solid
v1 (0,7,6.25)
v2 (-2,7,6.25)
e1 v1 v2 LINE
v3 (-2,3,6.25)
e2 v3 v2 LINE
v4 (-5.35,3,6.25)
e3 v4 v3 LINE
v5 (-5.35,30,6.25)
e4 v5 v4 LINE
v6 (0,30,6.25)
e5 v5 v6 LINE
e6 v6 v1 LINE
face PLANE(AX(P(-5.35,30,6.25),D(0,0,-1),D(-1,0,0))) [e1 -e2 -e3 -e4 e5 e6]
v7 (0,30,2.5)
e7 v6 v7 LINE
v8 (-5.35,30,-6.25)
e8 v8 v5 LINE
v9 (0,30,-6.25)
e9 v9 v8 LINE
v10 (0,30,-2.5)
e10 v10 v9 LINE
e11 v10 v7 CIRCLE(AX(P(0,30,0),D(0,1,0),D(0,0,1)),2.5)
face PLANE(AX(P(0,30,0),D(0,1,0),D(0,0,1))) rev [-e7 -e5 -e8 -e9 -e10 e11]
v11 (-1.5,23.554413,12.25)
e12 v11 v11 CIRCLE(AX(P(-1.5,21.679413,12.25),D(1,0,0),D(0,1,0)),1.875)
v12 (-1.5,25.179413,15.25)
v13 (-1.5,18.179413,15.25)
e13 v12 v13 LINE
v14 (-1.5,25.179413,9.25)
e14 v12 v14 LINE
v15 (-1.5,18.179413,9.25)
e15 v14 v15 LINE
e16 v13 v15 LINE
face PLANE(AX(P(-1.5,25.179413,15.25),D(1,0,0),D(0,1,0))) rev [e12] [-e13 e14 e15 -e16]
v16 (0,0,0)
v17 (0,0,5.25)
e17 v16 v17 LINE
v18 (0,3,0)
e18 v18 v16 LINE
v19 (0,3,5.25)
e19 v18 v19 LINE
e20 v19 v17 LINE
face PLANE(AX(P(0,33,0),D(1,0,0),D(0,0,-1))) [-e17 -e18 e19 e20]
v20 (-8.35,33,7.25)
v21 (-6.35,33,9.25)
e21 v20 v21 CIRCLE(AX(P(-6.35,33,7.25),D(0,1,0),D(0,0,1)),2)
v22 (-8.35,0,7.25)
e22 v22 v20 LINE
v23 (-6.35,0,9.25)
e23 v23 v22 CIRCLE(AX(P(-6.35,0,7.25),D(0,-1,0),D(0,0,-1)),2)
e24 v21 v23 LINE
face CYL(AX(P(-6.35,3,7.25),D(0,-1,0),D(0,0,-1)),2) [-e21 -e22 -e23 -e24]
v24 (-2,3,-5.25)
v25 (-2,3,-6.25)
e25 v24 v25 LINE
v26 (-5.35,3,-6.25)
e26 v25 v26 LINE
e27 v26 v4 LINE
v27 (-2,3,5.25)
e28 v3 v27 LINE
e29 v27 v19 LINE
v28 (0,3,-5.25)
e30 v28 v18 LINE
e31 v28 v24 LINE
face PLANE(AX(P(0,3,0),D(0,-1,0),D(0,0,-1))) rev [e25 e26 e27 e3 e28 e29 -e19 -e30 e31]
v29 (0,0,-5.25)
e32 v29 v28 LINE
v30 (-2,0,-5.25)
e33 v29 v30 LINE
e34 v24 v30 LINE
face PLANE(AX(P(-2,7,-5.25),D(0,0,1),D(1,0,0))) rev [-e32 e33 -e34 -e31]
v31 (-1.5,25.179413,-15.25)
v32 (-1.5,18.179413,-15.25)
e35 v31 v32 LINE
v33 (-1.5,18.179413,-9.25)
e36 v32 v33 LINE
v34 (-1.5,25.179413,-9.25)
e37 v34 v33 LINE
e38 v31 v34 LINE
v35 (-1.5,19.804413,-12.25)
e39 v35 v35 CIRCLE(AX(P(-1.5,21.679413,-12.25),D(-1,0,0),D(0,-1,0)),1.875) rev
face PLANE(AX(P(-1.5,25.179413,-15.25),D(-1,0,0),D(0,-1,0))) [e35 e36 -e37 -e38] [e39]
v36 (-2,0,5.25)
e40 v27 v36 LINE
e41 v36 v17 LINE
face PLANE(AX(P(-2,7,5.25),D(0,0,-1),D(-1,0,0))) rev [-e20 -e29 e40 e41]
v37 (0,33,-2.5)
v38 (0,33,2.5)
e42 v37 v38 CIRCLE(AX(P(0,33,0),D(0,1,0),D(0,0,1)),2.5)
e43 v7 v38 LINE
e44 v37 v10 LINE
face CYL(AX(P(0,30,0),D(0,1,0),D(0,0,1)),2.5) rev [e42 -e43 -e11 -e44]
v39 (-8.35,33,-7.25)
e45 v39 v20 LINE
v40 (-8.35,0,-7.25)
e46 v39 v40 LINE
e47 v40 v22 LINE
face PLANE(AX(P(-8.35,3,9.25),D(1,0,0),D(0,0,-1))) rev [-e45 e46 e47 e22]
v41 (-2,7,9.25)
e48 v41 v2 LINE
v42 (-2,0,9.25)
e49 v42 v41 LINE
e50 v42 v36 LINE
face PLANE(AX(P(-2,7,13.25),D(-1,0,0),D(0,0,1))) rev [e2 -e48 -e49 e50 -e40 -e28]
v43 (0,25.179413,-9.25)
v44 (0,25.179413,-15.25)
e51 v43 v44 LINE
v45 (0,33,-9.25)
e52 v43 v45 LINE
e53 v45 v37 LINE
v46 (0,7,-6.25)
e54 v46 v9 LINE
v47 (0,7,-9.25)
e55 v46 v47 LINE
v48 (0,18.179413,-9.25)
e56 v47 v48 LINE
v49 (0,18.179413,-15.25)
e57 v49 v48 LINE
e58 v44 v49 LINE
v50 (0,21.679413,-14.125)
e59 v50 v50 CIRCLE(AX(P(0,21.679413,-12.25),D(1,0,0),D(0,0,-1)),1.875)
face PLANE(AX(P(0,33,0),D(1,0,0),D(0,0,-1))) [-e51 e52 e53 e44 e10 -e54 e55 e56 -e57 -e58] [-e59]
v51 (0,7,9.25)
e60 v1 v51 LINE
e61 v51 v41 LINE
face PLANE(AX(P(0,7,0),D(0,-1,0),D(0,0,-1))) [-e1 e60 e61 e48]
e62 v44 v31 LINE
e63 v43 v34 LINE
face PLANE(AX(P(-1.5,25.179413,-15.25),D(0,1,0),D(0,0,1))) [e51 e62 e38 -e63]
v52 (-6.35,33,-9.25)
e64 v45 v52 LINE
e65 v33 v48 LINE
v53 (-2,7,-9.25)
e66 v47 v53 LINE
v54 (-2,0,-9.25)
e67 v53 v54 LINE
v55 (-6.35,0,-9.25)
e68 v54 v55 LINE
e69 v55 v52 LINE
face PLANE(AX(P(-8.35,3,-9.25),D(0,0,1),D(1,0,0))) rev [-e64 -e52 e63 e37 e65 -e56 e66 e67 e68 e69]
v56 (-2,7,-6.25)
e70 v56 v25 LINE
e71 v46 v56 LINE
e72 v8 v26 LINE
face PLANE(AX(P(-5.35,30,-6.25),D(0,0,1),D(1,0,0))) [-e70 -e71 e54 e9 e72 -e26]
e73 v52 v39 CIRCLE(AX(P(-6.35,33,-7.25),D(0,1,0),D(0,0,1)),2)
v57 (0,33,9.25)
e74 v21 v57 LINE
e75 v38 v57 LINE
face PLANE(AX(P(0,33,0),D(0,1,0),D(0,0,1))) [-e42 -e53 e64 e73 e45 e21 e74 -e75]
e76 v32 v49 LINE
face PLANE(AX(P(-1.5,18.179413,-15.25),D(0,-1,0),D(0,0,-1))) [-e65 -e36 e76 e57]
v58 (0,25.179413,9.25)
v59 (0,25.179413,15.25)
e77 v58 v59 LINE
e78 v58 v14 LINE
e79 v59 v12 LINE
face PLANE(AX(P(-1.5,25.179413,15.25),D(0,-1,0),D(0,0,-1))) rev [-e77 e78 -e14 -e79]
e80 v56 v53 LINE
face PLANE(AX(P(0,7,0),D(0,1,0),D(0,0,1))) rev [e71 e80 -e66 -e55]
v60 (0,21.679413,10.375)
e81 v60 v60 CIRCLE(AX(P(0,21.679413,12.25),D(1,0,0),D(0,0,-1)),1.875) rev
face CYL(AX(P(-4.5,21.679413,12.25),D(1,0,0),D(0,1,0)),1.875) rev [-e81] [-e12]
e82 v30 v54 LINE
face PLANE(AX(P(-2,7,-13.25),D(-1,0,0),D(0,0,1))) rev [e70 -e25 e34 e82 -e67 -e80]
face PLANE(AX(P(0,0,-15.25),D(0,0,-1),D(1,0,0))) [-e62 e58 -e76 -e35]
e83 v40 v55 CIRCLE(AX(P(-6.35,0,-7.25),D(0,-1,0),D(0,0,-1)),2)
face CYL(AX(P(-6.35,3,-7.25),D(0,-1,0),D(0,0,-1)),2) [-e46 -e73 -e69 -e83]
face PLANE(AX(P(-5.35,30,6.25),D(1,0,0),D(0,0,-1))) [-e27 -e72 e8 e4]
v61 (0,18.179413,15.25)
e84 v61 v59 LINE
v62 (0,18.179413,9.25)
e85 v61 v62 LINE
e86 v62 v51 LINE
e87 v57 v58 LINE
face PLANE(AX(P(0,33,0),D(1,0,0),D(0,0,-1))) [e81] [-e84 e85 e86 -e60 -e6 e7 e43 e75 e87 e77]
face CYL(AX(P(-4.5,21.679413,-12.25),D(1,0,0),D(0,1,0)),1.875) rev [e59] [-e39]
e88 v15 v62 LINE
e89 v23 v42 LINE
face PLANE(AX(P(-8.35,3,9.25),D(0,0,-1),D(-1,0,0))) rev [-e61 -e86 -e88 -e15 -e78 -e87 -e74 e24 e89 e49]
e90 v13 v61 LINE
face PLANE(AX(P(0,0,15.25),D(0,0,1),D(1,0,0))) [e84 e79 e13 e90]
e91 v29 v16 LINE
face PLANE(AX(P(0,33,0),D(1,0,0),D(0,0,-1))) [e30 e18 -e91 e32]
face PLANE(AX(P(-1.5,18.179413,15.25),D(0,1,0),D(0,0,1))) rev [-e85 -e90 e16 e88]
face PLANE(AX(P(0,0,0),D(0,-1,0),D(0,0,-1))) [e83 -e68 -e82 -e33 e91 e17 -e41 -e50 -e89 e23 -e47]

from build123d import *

# Parameters (mm, degrees)
SKETCH1_W           = 16.7
SKETCH1_H           = 18.5
BOSS_EXTRUDE1_DEPTH = 3
SKETCH2_W           = 16.7
SKETCH2_H           = 18.5
SKETCH2_W_2         = 10.7
SKETCH2_H_2         = 12.5
BOSS_EXTRUDE2_DEPTH = 27
SKETCH7_W           = 4
SKETCH7_H           = 8
CUT_EXTRUDE1_DEPTH  = 7
SKETCH9_W           = 16.7
SKETCH9_H           = 18.5
BOSS_EXTRUDE3_DEPTH = 3
SKETCH10_R          = 2.5
CUT_EXTRUDE2_DEPTH  = 3
FILLET1_R           = 2
SKETCH11_W          = 3
SKETCH11_H          = 7
BOSS_EXTRUDE4_DEPTH = 6
SKETCH12_R          = 1.875
CUT_EXTRUDE3_DEPTH  = 6
CUT_EXTRUDE4_START  = -33
CUT_EXTRUDE4_DEPTH  = 33


# Read off the part's stored shape, not the designer's step: Cut-Extrude4
with BuildPart() as part:
    # Sketch1 → Boss-Extrude1 (new body)
    with BuildSketch(Plane(origin=(0, 0, 0), x_dir=(1, 0, 0), z_dir=(0, 1, 0))):
        Rectangle(SKETCH1_W, SKETCH1_H)
    extrude(amount=BOSS_EXTRUDE1_DEPTH)

    # Sketch2 → Boss-Extrude2 (add)
    with BuildSketch(Plane(origin=(0, 3, 0), x_dir=(1, 0, 0), z_dir=(0, 1, 0))):
        Rectangle(SKETCH2_W, SKETCH2_H)
        Rectangle(SKETCH2_W_2, SKETCH2_H_2, mode=Mode.SUBTRACT)
    extrude(amount=BOSS_EXTRUDE2_DEPTH)

    # Sketch7 → Cut-Extrude1 (cut)
    with BuildSketch(Plane.XZ):
        with Locations((0, 9.25)):
            Rectangle(SKETCH7_W, SKETCH7_H)
        with Locations((0, -9.25)):
            Rectangle(SKETCH7_W, SKETCH7_H)
    extrude(amount=-CUT_EXTRUDE1_DEPTH, mode=Mode.SUBTRACT)

    # Sketch9 → Boss-Extrude3 (add)
    with BuildSketch(Plane(origin=(0, 30, 0), x_dir=(1, 0, 0), z_dir=(0, 1, 0))):
        Rectangle(SKETCH9_W, SKETCH9_H)
    extrude(amount=BOSS_EXTRUDE3_DEPTH)

    # Sketch10 → Cut-Extrude2 (cut)
    with BuildSketch(Plane(origin=(0, 33, 0), x_dir=(1, 0, 0), z_dir=(0, 1, 0))):
        with Locations(Location((0, 0, 0), (0, 0, 270))):
            Circle(SKETCH10_R)
    extrude(amount=-CUT_EXTRUDE2_DEPTH, mode=Mode.SUBTRACT)

    # Fillet1
    fillet1_edges = [part.edges().sort_by_distance(p)[0] for p in [
        (8.35, 16.5, 9.25),
        (-8.35, 16.5, 9.25),
        (-8.35, 16.5, -9.25),
        (8.35, 16.5, -9.25),
    ]]
    fillet(fillet1_edges, radius=FILLET1_R)

    # Sketch11 → Boss-Extrude4 (add)
    with BuildSketch(Plane.XY.offset(9.25)):
        with Locations((0, 21.679413475)):
            Rectangle(SKETCH11_W, SKETCH11_H)
    boss_extrude4 = extrude(amount=BOSS_EXTRUDE4_DEPTH)

    # Sketch12 → Cut-Extrude3 (cut)
    with BuildSketch(Plane(origin=(1.5, 0, 0), x_dir=(0, 0, -1), z_dir=(1, 0, 0))):
        with Locations(Location((-12.25, 21.679413475, 0), (0, 0, 90))):
            Circle(SKETCH12_R)
    cut_extrude3 = extrude(amount=-CUT_EXTRUDE3_DEPTH, mode=Mode.SUBTRACT)

    # Mirror1: Boss-Extrude4, Cut-Extrude3 across plane
    add(boss_extrude4.mirror(Plane.XY))
    add(cut_extrude3.mirror(Plane.XY), mode=Mode.SUBTRACT)

    # Cut-Extrude4 outline → Cut-Extrude4 (cut)
    with BuildSketch(Plane(origin=(0, 33, 0), x_dir=(1, 0, 0), z_dir=(0, 1, 0)).offset(CUT_EXTRUDE4_START)):
        with BuildLine():
            Line((0, -15.25), (1.5, -15.25))
            Line((1.5, -15.25), (1.5, -9.25))
            Line((1.5, -9.25), (6.35, -9.25))
            ThreePointArc((6.35, -9.25), (7.764213562, -8.664213562), (8.35, -7.25))
            Line((8.35, -7.25), (8.35, 7.25))
            ThreePointArc((8.35, 7.25), (7.764213562, 8.664213562), (6.35, 9.25))
            Line((6.35, 9.25), (1.5, 9.25))
            Line((1.5, 9.25), (1.5, 15.25))
            Line((1.5, 15.25), (0, 15.25))
            Line((0, 15.25), (0, -15.25))
        make_face()
    extrude(amount=CUT_EXTRUDE4_DEPTH, mode=Mode.SUBTRACT)


solid = part.part
